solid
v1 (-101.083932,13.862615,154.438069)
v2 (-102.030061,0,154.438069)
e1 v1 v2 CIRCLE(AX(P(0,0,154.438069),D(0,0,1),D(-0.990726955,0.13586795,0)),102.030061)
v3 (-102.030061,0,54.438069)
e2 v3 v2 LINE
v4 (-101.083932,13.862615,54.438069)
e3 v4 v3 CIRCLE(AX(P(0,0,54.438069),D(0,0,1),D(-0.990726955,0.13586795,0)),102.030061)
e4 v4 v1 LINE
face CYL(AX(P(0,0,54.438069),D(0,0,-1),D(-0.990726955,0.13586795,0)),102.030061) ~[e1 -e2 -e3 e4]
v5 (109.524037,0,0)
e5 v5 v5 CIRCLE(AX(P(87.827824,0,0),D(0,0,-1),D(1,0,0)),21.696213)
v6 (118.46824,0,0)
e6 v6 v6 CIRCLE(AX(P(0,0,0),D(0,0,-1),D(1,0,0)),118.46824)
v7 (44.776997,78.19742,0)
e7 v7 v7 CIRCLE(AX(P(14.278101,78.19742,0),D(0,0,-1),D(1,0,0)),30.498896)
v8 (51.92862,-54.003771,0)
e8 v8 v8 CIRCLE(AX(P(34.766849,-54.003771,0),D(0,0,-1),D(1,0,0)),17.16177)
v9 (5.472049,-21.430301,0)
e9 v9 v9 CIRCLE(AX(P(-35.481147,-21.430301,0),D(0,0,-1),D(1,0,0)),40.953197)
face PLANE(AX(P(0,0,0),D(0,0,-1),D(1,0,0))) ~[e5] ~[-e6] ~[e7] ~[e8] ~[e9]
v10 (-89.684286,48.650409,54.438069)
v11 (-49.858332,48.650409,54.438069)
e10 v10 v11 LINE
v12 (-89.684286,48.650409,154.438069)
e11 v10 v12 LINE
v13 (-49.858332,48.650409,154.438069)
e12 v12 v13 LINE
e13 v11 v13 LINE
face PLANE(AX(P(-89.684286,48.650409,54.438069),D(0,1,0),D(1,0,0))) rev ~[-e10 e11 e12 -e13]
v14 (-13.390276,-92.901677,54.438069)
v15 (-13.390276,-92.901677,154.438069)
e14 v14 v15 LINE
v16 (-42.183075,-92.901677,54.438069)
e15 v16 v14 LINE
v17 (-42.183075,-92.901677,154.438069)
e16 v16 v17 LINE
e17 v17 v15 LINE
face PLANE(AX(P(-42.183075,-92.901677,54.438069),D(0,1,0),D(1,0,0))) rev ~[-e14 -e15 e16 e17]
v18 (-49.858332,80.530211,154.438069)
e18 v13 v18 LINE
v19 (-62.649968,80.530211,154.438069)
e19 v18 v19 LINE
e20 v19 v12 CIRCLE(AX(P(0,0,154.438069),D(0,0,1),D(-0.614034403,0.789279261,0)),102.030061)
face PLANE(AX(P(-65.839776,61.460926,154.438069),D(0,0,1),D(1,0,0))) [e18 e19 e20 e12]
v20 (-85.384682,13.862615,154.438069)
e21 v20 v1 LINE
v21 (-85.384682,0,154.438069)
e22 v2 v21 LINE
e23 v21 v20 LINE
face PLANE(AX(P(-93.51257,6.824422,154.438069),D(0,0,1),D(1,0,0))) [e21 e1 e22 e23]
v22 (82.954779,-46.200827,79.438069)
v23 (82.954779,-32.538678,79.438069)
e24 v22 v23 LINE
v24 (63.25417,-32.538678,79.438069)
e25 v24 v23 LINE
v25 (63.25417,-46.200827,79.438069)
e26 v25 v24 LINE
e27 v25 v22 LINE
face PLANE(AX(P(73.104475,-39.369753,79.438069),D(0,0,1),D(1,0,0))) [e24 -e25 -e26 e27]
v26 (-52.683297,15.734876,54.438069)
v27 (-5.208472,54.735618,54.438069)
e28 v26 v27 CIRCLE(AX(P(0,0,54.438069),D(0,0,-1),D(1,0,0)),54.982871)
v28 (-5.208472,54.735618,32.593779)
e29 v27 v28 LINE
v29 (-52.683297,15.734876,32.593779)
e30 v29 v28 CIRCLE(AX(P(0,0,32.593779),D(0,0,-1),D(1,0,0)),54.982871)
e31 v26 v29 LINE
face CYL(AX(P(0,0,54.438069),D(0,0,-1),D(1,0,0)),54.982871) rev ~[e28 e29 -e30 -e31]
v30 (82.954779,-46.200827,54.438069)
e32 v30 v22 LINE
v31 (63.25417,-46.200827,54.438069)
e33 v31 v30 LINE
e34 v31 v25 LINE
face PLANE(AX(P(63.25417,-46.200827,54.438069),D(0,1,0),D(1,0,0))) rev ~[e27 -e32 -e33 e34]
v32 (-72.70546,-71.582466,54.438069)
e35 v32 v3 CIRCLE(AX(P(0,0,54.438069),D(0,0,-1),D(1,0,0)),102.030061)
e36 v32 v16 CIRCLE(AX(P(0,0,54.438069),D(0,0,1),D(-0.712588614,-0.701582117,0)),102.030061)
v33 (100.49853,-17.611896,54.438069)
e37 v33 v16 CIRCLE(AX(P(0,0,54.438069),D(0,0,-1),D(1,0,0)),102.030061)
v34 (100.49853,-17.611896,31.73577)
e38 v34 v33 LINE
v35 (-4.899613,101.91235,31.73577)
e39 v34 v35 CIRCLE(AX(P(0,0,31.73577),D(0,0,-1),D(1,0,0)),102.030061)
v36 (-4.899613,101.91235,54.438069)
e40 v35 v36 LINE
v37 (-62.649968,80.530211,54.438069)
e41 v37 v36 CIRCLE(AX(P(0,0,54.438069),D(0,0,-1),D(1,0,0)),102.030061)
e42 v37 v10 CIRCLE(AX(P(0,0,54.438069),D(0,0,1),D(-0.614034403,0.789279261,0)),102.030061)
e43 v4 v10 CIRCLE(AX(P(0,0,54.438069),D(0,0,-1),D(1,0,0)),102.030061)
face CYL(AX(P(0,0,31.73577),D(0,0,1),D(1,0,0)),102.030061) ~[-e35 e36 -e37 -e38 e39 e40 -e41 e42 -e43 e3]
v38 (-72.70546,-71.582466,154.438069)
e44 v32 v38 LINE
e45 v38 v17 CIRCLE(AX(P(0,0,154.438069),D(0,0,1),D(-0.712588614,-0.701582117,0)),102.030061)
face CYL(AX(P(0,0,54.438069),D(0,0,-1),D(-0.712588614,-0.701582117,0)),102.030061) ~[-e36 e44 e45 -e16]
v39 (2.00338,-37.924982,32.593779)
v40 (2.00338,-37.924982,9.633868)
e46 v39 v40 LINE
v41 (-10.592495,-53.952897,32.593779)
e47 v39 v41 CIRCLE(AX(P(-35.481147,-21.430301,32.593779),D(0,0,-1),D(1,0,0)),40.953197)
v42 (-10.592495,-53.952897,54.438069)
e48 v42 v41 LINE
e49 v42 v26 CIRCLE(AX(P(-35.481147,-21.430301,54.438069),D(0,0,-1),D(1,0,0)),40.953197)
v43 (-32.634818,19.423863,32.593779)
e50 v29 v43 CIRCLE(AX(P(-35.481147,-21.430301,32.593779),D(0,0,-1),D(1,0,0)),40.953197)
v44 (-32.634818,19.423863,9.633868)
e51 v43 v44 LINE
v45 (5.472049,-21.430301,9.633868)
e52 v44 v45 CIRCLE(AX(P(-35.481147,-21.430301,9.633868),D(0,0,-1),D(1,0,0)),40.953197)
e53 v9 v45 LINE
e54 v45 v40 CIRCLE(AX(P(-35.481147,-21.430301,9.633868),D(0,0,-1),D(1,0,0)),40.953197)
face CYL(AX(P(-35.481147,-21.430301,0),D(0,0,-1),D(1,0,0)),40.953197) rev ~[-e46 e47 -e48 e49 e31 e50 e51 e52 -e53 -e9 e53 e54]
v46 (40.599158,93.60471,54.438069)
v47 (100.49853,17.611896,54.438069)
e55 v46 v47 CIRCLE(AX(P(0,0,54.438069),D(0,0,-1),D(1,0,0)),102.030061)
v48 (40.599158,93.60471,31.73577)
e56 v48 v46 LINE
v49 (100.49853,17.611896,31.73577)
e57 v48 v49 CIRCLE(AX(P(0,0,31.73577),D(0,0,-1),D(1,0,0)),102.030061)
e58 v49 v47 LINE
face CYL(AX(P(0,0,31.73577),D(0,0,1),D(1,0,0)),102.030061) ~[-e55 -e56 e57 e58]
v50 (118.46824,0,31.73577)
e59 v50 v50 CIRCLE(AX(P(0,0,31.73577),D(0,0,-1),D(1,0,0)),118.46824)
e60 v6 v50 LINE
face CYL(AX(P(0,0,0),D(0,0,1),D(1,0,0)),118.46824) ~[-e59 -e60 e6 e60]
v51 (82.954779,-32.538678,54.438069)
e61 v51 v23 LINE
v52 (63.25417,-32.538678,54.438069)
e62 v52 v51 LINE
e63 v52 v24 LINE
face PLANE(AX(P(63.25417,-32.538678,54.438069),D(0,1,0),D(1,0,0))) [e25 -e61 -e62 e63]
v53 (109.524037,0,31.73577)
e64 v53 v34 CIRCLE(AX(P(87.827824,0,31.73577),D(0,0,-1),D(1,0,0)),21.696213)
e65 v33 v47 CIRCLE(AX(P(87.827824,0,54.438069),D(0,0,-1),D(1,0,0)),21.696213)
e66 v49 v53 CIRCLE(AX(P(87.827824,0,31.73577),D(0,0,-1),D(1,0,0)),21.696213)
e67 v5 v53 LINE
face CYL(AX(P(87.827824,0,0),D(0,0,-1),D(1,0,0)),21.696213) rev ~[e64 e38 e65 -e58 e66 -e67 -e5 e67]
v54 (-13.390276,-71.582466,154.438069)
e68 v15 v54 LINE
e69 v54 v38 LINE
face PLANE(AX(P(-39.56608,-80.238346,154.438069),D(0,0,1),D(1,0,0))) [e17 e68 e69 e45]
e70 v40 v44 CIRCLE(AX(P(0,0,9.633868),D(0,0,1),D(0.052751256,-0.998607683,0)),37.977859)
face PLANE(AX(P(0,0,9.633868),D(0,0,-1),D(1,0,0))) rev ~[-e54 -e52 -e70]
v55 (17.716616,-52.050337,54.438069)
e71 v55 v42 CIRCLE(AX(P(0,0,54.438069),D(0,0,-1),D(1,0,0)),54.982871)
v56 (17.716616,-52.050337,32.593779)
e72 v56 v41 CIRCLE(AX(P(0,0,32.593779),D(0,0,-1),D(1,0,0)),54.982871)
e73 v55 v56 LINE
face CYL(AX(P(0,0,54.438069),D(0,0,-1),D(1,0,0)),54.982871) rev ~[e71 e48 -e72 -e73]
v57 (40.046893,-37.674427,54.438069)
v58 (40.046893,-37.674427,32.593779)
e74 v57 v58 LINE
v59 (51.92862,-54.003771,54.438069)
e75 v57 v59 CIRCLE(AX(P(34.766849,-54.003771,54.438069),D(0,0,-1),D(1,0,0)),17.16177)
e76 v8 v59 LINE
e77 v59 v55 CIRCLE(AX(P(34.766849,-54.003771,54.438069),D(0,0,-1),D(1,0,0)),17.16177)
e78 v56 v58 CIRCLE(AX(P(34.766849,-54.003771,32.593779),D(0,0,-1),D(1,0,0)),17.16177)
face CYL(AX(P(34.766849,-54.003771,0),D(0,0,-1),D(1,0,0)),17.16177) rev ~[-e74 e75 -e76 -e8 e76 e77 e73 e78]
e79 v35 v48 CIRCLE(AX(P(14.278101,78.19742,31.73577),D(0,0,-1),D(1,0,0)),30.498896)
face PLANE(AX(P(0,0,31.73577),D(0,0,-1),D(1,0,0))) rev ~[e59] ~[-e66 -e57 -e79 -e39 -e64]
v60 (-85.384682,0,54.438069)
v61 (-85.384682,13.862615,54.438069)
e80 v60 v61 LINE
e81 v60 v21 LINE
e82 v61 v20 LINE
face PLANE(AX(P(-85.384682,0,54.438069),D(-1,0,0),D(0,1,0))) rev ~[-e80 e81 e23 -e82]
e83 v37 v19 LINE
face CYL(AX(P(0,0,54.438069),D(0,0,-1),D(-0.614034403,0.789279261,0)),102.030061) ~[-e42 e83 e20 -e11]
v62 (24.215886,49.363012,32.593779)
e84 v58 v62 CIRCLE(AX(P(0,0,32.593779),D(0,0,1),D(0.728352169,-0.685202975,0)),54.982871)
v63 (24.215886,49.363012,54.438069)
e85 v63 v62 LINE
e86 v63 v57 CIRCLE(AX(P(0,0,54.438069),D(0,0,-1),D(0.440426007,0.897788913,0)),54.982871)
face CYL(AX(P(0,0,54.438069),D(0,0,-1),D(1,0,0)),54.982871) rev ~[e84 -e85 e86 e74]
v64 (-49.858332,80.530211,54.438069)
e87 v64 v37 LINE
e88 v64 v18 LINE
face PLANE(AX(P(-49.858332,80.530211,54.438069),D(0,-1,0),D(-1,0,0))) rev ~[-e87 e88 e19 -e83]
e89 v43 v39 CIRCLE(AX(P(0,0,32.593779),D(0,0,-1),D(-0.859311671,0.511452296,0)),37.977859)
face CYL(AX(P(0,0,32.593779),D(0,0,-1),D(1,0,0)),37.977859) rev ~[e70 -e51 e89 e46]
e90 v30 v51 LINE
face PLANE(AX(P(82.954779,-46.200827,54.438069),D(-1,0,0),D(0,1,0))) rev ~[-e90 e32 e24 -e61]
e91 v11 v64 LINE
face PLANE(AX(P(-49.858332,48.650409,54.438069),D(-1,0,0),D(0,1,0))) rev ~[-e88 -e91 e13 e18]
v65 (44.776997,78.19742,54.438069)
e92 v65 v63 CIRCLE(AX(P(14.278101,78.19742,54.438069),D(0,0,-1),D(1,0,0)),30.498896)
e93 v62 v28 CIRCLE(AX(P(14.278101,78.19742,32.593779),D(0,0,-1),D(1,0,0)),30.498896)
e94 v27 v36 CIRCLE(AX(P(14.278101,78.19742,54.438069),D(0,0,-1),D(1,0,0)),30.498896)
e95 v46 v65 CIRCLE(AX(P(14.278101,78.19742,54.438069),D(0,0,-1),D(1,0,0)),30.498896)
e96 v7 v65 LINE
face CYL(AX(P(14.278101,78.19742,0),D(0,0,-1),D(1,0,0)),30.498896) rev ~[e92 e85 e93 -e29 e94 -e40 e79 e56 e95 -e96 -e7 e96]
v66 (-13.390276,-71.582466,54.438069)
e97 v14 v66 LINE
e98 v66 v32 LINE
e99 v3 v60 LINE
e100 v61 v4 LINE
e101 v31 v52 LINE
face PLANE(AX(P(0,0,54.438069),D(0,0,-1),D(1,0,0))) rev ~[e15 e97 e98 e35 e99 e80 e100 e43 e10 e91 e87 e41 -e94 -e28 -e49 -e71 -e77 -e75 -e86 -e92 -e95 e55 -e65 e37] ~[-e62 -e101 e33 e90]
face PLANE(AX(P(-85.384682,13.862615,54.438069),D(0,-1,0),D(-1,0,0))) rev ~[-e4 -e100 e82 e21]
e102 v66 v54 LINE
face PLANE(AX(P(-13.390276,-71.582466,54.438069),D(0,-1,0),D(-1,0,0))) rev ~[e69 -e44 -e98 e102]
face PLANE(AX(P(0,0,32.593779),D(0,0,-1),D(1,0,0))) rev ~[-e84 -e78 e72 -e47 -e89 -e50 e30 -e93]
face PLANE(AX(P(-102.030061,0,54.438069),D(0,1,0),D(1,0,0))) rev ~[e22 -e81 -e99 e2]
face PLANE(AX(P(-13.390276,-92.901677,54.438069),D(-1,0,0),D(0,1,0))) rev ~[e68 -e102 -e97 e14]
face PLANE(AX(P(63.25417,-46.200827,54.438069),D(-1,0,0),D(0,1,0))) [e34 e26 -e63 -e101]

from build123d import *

# Parameters (mm, degrees)
F2_R     = 21.6962130455
F2_R_2   = 17.1617704493
F2_R_3   = 40.953196501
F2_R_4   = 30.4988959279
F3_DEPTH = 1000
F5_DEPTH = 100
F6_W     = 19.7006091475
F6_H     = 13.662148267
F7_DEPTH = 25


# Not quite as in the source:
# - after a boolean that leaves OpenCascade's solid faulty, fix() repairs it


with BuildPart() as f1:
    # F0 (on Front) → F1 (revolve)
    with BuildSketch(Plane.XZ):
        Polygon((0, 9.6338680014), (0, 0), (118.4682399035, 0), (118.4682399035, 31.7357704043), (102.0300611854, 31.7357704043), (102.0300611854, 54.4380694628), (54.9828708172, 54.4380694628), (54.9828708172, 32.5937792659), (37.9778593779, 32.5937792659), (37.9778593779, 9.6338680014), align=None)
    revolve(axis=Axis((0, 0, 4.8169340007), (0, 0, -1)))

    # F2 (on face) → F3 (cut)
    with BuildSketch(Plane(origin=(0, 0, 0), x_dir=(1, 0, 0), z_dir=(0, 0, -1))):
        with Locations((87.8278240561, 0)):
            Circle(F2_R)
        with Locations((34.7668491304, 54.0037713945)):
            Circle(F2_R_2)
        with Locations((-35.4811474681, 21.4303005487)):
            Circle(F2_R_3)
        with Locations((14.2781008035, -78.1974196434)):
            Circle(F2_R_4)
    extrude(amount=-F3_DEPTH, mode=Mode.SUBTRACT)

    # F4 (on face) → F5 (join)
    with BuildSketch(Plane.XY.offset(54.4380694628)):
        with BuildLine():
            Line((-49.8583316803, 48.6504090547), (-49.8583316803, 80.5302113295))
            Line((-49.8583316803, 80.5302113295), (-62.6499676674, 80.5302113295))
            ThreePointArc((-62.6499676674, 80.5302113295), (-77.8171679529, 65.9895579412), (-89.684285604, 48.6504090547))
            Line((-89.684285604, 48.6504090547), (-49.8583316803, 48.6504090547))
        make_face()
        with BuildLine():
            Line((-85.3846818209, 13.8626152044), (-101.0839318843, 13.8626152044))
            ThreePointArc((-101.0839318843, 13.8626152044), (-101.7932540508, 6.9474322767), (-102.0300611854, 0))
            Line((-102.0300611854, 0), (-85.3846818209, 0))
            Line((-85.3846818209, 0), (-85.3846818209, 13.8626152044))
        make_face()
        with BuildLine():
            Line((-13.3902756497, -71.5824663639), (-72.7054598689, -71.5824663639))
            ThreePointArc((-72.7054598689, -71.5824663639), (-58.4249180154, -83.6460539439), (-42.1830749936, -92.9016768932))
            Line((-42.1830749936, -92.9016768932), (-13.3902756497, -92.9016768932))
            Line((-13.3902756497, -92.9016768932), (-13.3902756497, -71.5824663639))
        make_face()
    extrude(amount=F5_DEPTH)

    add(f1.part.fix(), mode=Mode.REPLACE)

    # F6 (on face) → F7 (join)
    with BuildSketch(Plane.XY.offset(54.4380694628)):
        with Locations((73.1044746935, -39.3697526306)):
            Rectangle(F6_W, F6_H)
    extrude(amount=F7_DEPTH)


solid = f1.part
